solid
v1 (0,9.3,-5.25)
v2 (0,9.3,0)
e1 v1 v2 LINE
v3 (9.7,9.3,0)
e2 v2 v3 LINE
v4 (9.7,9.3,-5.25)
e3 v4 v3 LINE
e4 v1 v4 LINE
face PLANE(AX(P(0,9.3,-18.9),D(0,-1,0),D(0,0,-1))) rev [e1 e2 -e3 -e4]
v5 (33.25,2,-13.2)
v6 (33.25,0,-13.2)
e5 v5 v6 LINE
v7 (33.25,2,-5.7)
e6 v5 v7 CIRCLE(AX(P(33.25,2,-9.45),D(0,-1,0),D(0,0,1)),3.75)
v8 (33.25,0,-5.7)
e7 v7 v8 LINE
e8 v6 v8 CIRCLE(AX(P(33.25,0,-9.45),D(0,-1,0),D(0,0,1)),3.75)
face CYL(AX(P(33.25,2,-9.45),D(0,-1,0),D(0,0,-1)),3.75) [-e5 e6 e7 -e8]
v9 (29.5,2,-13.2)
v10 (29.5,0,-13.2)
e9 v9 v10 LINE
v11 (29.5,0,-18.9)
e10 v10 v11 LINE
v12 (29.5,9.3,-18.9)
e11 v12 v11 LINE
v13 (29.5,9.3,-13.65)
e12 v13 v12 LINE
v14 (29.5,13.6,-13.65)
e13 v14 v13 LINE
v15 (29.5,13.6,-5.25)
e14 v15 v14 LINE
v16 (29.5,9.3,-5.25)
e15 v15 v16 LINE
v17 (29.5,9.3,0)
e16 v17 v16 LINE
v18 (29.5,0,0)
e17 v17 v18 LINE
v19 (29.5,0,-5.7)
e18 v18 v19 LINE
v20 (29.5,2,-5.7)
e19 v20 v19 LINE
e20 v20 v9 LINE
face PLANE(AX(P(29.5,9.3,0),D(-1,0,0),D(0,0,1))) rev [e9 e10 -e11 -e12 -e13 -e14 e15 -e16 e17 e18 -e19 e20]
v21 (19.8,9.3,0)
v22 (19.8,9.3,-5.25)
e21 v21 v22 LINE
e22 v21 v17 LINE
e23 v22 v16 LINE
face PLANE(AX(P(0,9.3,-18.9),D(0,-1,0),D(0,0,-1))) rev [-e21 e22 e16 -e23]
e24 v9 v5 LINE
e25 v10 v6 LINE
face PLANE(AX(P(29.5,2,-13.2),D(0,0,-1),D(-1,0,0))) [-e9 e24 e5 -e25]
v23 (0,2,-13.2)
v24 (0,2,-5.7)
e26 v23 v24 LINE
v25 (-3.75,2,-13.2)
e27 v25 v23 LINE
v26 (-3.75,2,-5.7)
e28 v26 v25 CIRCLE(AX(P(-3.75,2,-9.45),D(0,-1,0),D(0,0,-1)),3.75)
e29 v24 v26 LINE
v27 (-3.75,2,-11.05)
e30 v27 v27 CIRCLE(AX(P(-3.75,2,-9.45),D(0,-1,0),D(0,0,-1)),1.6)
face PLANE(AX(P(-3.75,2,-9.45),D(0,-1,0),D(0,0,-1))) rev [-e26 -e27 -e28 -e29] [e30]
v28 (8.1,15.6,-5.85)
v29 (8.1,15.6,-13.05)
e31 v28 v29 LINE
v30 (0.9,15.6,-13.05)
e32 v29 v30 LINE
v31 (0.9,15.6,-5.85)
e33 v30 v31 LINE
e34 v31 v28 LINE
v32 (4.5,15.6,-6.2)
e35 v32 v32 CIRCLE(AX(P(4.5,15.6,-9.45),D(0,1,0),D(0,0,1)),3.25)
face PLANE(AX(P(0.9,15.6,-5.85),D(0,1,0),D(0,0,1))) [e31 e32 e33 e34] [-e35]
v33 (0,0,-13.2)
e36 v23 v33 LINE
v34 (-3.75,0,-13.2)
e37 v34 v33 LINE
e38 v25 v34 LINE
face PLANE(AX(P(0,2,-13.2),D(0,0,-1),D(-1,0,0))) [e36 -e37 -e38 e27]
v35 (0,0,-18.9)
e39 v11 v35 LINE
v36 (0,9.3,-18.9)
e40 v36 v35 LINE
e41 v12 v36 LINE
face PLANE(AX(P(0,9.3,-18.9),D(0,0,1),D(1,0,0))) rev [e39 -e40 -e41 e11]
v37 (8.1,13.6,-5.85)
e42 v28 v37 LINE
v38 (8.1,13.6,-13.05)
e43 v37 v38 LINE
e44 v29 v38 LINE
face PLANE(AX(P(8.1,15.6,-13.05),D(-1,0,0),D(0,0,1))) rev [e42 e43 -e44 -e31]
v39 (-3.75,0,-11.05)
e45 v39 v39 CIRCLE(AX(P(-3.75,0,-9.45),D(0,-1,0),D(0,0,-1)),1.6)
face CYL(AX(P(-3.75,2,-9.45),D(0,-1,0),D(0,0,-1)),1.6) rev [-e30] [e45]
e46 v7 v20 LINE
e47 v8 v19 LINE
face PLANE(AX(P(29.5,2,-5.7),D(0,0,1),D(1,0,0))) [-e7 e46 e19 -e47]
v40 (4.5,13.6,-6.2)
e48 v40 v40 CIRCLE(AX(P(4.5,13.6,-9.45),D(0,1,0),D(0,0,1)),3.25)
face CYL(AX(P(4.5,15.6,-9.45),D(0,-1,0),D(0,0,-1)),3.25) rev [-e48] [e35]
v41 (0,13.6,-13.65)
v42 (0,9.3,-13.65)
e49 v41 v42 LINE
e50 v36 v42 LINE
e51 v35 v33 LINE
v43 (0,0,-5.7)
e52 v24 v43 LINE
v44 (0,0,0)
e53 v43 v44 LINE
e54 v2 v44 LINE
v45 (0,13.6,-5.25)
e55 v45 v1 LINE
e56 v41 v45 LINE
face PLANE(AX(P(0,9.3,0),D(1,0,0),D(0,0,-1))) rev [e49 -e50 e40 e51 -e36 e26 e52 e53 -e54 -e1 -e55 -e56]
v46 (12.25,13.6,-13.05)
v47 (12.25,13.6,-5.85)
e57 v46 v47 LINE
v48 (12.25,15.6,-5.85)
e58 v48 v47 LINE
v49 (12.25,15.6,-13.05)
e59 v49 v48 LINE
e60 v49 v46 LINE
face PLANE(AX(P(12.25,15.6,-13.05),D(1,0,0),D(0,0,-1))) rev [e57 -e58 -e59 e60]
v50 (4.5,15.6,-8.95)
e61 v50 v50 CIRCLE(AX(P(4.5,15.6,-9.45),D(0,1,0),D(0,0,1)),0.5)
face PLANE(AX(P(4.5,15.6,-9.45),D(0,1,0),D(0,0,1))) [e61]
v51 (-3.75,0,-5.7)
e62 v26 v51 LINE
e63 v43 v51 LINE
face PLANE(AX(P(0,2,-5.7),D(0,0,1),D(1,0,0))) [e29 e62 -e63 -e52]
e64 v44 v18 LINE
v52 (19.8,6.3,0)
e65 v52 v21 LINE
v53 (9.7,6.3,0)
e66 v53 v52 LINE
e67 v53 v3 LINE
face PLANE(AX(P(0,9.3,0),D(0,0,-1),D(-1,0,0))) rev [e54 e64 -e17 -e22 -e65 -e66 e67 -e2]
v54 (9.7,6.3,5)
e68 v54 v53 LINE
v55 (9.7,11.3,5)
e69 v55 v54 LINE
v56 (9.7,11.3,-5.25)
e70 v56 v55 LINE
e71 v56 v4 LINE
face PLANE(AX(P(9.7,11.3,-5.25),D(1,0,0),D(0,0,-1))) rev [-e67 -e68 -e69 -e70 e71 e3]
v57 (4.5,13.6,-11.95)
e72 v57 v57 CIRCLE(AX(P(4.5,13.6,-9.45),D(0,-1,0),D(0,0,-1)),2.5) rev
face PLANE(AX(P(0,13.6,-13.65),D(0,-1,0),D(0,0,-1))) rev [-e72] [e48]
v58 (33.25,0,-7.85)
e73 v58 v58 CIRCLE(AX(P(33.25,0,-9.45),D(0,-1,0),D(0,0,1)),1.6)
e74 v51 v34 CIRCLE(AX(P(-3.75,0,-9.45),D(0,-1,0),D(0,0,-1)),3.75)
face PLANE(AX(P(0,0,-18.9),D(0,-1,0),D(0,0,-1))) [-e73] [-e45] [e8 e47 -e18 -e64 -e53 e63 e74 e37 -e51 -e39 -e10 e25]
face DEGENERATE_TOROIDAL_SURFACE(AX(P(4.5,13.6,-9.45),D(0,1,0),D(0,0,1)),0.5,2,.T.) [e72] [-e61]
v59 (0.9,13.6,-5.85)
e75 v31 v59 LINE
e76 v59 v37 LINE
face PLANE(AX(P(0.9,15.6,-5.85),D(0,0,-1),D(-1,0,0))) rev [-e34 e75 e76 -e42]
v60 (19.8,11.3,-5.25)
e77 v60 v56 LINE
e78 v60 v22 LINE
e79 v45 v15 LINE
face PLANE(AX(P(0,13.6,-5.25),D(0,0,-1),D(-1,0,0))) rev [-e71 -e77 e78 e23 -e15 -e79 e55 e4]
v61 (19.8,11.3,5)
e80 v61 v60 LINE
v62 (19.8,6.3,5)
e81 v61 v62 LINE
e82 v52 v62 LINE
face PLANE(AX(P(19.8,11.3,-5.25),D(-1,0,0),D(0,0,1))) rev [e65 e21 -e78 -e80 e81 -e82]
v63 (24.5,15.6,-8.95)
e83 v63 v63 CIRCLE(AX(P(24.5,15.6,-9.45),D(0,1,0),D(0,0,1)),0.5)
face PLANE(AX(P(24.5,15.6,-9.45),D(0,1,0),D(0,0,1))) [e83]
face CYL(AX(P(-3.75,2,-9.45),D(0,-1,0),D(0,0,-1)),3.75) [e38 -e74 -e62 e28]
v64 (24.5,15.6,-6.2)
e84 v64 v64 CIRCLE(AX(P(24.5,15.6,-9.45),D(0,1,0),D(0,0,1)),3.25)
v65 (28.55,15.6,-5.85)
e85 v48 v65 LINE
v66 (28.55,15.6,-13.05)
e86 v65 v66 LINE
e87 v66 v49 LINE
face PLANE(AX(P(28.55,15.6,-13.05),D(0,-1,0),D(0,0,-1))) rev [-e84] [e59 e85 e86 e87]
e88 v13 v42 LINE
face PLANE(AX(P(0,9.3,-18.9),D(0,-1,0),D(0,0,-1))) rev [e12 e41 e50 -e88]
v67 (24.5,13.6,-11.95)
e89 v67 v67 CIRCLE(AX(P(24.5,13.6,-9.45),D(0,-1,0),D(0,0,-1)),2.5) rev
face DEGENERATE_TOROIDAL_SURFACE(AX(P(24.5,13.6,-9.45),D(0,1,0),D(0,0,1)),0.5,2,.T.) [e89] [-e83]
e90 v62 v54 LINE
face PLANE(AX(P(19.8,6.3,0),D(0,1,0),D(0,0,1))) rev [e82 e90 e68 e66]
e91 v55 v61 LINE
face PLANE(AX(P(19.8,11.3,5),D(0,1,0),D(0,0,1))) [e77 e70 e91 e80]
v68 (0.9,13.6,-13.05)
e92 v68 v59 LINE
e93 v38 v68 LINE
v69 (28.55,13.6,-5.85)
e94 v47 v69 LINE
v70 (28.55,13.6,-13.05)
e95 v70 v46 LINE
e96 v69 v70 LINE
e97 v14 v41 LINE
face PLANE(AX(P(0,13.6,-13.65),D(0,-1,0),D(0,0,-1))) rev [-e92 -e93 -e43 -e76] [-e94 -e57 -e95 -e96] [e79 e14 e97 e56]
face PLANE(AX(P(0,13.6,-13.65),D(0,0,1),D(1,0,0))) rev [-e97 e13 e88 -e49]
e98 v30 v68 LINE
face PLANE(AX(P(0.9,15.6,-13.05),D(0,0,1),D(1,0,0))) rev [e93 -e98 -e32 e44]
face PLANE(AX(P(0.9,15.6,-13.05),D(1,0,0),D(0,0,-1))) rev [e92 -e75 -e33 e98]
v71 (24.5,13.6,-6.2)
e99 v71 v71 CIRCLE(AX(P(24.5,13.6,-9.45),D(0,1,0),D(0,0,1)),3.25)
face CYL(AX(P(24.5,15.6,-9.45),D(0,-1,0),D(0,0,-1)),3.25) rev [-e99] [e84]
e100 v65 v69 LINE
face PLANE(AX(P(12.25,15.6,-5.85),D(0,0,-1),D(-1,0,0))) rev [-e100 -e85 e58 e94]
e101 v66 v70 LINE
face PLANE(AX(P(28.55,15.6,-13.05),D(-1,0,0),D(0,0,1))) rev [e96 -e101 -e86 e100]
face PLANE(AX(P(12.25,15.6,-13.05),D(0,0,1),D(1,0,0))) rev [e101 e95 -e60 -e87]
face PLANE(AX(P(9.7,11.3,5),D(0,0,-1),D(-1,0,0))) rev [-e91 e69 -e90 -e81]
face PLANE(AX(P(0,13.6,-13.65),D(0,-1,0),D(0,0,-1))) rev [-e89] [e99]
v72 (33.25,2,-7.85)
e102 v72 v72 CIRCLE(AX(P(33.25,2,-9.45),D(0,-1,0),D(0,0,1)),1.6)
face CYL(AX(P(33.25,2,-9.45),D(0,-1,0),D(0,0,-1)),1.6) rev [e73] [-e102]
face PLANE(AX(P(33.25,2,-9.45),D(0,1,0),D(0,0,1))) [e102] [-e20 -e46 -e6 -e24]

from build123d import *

# Parameters (mm, degrees)
ESQUISSE1_W      = 29.5
ESQUISSE1_H      = 18.9
EXTRUSION1_DEPTH = 9.3
ESQUISSE2_W      = 29.5
ESQUISSE2_H      = 8.4
EXTRUSION2_DEPTH = 4.3
ESQUISSE3_W      = 7.2
ESQUISSE3_H      = 7.2
ESQUISSE3_R      = 3.25
ESQUISSE3_W_2    = 16.3
EXTRUSION3_DEPTH = 2
ESQUISSE4_R      = 2.5
EXTRUSION4_DEPTH = 2
CONG_1_R         = 2
ESQUISSE5_R      = 1.6
EXTRUSION5_DEPTH = 2
ESQUISSE6_W      = 10.1
ESQUISSE6_H      = 10.25
EXTRUSION6_DEPTH = 2
ESQUISSE7_W      = 10.1
ESQUISSE7_H      = 5
EXTRUSION7_DEPTH = 3


with BuildPart() as part:
    # Esquisse1 → Extrusion1 (new body)
    with BuildSketch(Plane(origin=(0, 0, 0), x_dir=(1, 0, 0), z_dir=(0, 1, 0))):
        with Locations((14.75, 9.45)):
            Rectangle(ESQUISSE1_W, ESQUISSE1_H)
    extrude(amount=EXTRUSION1_DEPTH)

    # Esquisse2 → Extrusion2 (add)
    with BuildSketch(Plane(origin=(0, 9.3, 0), x_dir=(1, 0, 0), z_dir=(0, 1, 0))):
        with Locations((14.75, 9.45)):
            Rectangle(ESQUISSE2_W, ESQUISSE2_H)
    extrude(amount=EXTRUSION2_DEPTH)

    # Esquisse3 → Extrusion3 (add)
    # profile 1 of 2: a face of its own
    with BuildSketch(Plane(origin=(0, 13.6, 0), x_dir=(1, 0, 0), z_dir=(0, 1, 0))):
        with Locations((4.5, 9.45)):
            Rectangle(ESQUISSE3_W, ESQUISSE3_H)
        with Locations(Location((4.5, 9.45, 0), (0, 0, 270))):
            Circle(ESQUISSE3_R, mode=Mode.SUBTRACT)
    # profile 2 of 2: a face of its own
    with BuildSketch(Plane(origin=(0, 13.6, 0), x_dir=(1, 0, 0), z_dir=(0, 1, 0))):
        with Locations((20.4, 9.45)):
            Rectangle(ESQUISSE3_W_2, ESQUISSE3_H)
        with Locations(Location((24.5, 9.45, 0), (0, 0, 270))):
            Circle(ESQUISSE3_R, mode=Mode.SUBTRACT)
    extrude(amount=EXTRUSION3_DEPTH)

    # Esquisse4 → Extrusion4 (add)
    with BuildSketch(Plane(origin=(0, 13.6, 0), x_dir=(1, 0, 0), z_dir=(0, 1, 0))):
        with Locations(Location((4.5, 9.45, 0), (0, 0, 90))):
            Circle(ESQUISSE4_R)
        with Locations(Location((24.5, 9.45, 0), (0, 0, 90))):
            Circle(ESQUISSE4_R)
    extrude(amount=EXTRUSION4_DEPTH)

    # Congé1
    cong_1_edges = [part.edges().sort_by_distance(p)[0] for p in [
        (4.5, 15.6, -6.95),
        (24.5, 15.6, -6.95),
    ]]
    fillet(cong_1_edges, radius=CONG_1_R - 0.0001)  # a hair under: the kernel refuses the full size

    # Esquisse5 → Extrusion5 (add)
    # profile 1 of 2: a face of its own
    with BuildSketch(Plane.XZ):
        with BuildLine():
            Line((0, -5.7), (-3.75, -5.7))
            ThreePointArc((-3.75, -5.7), (-7.5, -9.45), (-3.75, -13.2))
            Line((-3.75, -13.2), (0, -13.2))
            Line((0, -13.2), (0, -5.7))
        make_face()
        with Locations(Location((-3.75, -9.45, 0), (0, 0, 270))):
            Circle(ESQUISSE5_R, mode=Mode.SUBTRACT)
    # profile 2 of 2: a face of its own
    with BuildSketch(Plane.XZ):
        with BuildLine():
            Line((29.5, -5.7), (33.25, -5.7))
            ThreePointArc((33.25, -5.7), (37, -9.45), (33.25, -13.2))
            Line((33.25, -13.2), (29.5, -13.2))
            Line((29.5, -13.2), (29.5, -5.7))
        make_face()
        with Locations(Location((33.25, -9.45, 0), (0, 0, 90))):
            Circle(ESQUISSE5_R, mode=Mode.SUBTRACT)
    extrude(amount=-EXTRUSION5_DEPTH)

    # Esquisse6 → Extrusion6 (add)
    with BuildSketch(Plane(origin=(0, 9.3, 0), x_dir=(1, 0, 0), z_dir=(0, 1, 0))):
        with Locations((14.75, 0.125)):
            Rectangle(ESQUISSE6_W, ESQUISSE6_H)
    extrude(amount=EXTRUSION6_DEPTH)

    # Esquisse7 → Extrusion7 (add)
    with BuildSketch(Plane.XZ.offset(-9.3)):
        with Locations((14.75, 2.5)):
            Rectangle(ESQUISSE7_W, ESQUISSE7_H)
    extrude(amount=EXTRUSION7_DEPTH)


solid = part.part
